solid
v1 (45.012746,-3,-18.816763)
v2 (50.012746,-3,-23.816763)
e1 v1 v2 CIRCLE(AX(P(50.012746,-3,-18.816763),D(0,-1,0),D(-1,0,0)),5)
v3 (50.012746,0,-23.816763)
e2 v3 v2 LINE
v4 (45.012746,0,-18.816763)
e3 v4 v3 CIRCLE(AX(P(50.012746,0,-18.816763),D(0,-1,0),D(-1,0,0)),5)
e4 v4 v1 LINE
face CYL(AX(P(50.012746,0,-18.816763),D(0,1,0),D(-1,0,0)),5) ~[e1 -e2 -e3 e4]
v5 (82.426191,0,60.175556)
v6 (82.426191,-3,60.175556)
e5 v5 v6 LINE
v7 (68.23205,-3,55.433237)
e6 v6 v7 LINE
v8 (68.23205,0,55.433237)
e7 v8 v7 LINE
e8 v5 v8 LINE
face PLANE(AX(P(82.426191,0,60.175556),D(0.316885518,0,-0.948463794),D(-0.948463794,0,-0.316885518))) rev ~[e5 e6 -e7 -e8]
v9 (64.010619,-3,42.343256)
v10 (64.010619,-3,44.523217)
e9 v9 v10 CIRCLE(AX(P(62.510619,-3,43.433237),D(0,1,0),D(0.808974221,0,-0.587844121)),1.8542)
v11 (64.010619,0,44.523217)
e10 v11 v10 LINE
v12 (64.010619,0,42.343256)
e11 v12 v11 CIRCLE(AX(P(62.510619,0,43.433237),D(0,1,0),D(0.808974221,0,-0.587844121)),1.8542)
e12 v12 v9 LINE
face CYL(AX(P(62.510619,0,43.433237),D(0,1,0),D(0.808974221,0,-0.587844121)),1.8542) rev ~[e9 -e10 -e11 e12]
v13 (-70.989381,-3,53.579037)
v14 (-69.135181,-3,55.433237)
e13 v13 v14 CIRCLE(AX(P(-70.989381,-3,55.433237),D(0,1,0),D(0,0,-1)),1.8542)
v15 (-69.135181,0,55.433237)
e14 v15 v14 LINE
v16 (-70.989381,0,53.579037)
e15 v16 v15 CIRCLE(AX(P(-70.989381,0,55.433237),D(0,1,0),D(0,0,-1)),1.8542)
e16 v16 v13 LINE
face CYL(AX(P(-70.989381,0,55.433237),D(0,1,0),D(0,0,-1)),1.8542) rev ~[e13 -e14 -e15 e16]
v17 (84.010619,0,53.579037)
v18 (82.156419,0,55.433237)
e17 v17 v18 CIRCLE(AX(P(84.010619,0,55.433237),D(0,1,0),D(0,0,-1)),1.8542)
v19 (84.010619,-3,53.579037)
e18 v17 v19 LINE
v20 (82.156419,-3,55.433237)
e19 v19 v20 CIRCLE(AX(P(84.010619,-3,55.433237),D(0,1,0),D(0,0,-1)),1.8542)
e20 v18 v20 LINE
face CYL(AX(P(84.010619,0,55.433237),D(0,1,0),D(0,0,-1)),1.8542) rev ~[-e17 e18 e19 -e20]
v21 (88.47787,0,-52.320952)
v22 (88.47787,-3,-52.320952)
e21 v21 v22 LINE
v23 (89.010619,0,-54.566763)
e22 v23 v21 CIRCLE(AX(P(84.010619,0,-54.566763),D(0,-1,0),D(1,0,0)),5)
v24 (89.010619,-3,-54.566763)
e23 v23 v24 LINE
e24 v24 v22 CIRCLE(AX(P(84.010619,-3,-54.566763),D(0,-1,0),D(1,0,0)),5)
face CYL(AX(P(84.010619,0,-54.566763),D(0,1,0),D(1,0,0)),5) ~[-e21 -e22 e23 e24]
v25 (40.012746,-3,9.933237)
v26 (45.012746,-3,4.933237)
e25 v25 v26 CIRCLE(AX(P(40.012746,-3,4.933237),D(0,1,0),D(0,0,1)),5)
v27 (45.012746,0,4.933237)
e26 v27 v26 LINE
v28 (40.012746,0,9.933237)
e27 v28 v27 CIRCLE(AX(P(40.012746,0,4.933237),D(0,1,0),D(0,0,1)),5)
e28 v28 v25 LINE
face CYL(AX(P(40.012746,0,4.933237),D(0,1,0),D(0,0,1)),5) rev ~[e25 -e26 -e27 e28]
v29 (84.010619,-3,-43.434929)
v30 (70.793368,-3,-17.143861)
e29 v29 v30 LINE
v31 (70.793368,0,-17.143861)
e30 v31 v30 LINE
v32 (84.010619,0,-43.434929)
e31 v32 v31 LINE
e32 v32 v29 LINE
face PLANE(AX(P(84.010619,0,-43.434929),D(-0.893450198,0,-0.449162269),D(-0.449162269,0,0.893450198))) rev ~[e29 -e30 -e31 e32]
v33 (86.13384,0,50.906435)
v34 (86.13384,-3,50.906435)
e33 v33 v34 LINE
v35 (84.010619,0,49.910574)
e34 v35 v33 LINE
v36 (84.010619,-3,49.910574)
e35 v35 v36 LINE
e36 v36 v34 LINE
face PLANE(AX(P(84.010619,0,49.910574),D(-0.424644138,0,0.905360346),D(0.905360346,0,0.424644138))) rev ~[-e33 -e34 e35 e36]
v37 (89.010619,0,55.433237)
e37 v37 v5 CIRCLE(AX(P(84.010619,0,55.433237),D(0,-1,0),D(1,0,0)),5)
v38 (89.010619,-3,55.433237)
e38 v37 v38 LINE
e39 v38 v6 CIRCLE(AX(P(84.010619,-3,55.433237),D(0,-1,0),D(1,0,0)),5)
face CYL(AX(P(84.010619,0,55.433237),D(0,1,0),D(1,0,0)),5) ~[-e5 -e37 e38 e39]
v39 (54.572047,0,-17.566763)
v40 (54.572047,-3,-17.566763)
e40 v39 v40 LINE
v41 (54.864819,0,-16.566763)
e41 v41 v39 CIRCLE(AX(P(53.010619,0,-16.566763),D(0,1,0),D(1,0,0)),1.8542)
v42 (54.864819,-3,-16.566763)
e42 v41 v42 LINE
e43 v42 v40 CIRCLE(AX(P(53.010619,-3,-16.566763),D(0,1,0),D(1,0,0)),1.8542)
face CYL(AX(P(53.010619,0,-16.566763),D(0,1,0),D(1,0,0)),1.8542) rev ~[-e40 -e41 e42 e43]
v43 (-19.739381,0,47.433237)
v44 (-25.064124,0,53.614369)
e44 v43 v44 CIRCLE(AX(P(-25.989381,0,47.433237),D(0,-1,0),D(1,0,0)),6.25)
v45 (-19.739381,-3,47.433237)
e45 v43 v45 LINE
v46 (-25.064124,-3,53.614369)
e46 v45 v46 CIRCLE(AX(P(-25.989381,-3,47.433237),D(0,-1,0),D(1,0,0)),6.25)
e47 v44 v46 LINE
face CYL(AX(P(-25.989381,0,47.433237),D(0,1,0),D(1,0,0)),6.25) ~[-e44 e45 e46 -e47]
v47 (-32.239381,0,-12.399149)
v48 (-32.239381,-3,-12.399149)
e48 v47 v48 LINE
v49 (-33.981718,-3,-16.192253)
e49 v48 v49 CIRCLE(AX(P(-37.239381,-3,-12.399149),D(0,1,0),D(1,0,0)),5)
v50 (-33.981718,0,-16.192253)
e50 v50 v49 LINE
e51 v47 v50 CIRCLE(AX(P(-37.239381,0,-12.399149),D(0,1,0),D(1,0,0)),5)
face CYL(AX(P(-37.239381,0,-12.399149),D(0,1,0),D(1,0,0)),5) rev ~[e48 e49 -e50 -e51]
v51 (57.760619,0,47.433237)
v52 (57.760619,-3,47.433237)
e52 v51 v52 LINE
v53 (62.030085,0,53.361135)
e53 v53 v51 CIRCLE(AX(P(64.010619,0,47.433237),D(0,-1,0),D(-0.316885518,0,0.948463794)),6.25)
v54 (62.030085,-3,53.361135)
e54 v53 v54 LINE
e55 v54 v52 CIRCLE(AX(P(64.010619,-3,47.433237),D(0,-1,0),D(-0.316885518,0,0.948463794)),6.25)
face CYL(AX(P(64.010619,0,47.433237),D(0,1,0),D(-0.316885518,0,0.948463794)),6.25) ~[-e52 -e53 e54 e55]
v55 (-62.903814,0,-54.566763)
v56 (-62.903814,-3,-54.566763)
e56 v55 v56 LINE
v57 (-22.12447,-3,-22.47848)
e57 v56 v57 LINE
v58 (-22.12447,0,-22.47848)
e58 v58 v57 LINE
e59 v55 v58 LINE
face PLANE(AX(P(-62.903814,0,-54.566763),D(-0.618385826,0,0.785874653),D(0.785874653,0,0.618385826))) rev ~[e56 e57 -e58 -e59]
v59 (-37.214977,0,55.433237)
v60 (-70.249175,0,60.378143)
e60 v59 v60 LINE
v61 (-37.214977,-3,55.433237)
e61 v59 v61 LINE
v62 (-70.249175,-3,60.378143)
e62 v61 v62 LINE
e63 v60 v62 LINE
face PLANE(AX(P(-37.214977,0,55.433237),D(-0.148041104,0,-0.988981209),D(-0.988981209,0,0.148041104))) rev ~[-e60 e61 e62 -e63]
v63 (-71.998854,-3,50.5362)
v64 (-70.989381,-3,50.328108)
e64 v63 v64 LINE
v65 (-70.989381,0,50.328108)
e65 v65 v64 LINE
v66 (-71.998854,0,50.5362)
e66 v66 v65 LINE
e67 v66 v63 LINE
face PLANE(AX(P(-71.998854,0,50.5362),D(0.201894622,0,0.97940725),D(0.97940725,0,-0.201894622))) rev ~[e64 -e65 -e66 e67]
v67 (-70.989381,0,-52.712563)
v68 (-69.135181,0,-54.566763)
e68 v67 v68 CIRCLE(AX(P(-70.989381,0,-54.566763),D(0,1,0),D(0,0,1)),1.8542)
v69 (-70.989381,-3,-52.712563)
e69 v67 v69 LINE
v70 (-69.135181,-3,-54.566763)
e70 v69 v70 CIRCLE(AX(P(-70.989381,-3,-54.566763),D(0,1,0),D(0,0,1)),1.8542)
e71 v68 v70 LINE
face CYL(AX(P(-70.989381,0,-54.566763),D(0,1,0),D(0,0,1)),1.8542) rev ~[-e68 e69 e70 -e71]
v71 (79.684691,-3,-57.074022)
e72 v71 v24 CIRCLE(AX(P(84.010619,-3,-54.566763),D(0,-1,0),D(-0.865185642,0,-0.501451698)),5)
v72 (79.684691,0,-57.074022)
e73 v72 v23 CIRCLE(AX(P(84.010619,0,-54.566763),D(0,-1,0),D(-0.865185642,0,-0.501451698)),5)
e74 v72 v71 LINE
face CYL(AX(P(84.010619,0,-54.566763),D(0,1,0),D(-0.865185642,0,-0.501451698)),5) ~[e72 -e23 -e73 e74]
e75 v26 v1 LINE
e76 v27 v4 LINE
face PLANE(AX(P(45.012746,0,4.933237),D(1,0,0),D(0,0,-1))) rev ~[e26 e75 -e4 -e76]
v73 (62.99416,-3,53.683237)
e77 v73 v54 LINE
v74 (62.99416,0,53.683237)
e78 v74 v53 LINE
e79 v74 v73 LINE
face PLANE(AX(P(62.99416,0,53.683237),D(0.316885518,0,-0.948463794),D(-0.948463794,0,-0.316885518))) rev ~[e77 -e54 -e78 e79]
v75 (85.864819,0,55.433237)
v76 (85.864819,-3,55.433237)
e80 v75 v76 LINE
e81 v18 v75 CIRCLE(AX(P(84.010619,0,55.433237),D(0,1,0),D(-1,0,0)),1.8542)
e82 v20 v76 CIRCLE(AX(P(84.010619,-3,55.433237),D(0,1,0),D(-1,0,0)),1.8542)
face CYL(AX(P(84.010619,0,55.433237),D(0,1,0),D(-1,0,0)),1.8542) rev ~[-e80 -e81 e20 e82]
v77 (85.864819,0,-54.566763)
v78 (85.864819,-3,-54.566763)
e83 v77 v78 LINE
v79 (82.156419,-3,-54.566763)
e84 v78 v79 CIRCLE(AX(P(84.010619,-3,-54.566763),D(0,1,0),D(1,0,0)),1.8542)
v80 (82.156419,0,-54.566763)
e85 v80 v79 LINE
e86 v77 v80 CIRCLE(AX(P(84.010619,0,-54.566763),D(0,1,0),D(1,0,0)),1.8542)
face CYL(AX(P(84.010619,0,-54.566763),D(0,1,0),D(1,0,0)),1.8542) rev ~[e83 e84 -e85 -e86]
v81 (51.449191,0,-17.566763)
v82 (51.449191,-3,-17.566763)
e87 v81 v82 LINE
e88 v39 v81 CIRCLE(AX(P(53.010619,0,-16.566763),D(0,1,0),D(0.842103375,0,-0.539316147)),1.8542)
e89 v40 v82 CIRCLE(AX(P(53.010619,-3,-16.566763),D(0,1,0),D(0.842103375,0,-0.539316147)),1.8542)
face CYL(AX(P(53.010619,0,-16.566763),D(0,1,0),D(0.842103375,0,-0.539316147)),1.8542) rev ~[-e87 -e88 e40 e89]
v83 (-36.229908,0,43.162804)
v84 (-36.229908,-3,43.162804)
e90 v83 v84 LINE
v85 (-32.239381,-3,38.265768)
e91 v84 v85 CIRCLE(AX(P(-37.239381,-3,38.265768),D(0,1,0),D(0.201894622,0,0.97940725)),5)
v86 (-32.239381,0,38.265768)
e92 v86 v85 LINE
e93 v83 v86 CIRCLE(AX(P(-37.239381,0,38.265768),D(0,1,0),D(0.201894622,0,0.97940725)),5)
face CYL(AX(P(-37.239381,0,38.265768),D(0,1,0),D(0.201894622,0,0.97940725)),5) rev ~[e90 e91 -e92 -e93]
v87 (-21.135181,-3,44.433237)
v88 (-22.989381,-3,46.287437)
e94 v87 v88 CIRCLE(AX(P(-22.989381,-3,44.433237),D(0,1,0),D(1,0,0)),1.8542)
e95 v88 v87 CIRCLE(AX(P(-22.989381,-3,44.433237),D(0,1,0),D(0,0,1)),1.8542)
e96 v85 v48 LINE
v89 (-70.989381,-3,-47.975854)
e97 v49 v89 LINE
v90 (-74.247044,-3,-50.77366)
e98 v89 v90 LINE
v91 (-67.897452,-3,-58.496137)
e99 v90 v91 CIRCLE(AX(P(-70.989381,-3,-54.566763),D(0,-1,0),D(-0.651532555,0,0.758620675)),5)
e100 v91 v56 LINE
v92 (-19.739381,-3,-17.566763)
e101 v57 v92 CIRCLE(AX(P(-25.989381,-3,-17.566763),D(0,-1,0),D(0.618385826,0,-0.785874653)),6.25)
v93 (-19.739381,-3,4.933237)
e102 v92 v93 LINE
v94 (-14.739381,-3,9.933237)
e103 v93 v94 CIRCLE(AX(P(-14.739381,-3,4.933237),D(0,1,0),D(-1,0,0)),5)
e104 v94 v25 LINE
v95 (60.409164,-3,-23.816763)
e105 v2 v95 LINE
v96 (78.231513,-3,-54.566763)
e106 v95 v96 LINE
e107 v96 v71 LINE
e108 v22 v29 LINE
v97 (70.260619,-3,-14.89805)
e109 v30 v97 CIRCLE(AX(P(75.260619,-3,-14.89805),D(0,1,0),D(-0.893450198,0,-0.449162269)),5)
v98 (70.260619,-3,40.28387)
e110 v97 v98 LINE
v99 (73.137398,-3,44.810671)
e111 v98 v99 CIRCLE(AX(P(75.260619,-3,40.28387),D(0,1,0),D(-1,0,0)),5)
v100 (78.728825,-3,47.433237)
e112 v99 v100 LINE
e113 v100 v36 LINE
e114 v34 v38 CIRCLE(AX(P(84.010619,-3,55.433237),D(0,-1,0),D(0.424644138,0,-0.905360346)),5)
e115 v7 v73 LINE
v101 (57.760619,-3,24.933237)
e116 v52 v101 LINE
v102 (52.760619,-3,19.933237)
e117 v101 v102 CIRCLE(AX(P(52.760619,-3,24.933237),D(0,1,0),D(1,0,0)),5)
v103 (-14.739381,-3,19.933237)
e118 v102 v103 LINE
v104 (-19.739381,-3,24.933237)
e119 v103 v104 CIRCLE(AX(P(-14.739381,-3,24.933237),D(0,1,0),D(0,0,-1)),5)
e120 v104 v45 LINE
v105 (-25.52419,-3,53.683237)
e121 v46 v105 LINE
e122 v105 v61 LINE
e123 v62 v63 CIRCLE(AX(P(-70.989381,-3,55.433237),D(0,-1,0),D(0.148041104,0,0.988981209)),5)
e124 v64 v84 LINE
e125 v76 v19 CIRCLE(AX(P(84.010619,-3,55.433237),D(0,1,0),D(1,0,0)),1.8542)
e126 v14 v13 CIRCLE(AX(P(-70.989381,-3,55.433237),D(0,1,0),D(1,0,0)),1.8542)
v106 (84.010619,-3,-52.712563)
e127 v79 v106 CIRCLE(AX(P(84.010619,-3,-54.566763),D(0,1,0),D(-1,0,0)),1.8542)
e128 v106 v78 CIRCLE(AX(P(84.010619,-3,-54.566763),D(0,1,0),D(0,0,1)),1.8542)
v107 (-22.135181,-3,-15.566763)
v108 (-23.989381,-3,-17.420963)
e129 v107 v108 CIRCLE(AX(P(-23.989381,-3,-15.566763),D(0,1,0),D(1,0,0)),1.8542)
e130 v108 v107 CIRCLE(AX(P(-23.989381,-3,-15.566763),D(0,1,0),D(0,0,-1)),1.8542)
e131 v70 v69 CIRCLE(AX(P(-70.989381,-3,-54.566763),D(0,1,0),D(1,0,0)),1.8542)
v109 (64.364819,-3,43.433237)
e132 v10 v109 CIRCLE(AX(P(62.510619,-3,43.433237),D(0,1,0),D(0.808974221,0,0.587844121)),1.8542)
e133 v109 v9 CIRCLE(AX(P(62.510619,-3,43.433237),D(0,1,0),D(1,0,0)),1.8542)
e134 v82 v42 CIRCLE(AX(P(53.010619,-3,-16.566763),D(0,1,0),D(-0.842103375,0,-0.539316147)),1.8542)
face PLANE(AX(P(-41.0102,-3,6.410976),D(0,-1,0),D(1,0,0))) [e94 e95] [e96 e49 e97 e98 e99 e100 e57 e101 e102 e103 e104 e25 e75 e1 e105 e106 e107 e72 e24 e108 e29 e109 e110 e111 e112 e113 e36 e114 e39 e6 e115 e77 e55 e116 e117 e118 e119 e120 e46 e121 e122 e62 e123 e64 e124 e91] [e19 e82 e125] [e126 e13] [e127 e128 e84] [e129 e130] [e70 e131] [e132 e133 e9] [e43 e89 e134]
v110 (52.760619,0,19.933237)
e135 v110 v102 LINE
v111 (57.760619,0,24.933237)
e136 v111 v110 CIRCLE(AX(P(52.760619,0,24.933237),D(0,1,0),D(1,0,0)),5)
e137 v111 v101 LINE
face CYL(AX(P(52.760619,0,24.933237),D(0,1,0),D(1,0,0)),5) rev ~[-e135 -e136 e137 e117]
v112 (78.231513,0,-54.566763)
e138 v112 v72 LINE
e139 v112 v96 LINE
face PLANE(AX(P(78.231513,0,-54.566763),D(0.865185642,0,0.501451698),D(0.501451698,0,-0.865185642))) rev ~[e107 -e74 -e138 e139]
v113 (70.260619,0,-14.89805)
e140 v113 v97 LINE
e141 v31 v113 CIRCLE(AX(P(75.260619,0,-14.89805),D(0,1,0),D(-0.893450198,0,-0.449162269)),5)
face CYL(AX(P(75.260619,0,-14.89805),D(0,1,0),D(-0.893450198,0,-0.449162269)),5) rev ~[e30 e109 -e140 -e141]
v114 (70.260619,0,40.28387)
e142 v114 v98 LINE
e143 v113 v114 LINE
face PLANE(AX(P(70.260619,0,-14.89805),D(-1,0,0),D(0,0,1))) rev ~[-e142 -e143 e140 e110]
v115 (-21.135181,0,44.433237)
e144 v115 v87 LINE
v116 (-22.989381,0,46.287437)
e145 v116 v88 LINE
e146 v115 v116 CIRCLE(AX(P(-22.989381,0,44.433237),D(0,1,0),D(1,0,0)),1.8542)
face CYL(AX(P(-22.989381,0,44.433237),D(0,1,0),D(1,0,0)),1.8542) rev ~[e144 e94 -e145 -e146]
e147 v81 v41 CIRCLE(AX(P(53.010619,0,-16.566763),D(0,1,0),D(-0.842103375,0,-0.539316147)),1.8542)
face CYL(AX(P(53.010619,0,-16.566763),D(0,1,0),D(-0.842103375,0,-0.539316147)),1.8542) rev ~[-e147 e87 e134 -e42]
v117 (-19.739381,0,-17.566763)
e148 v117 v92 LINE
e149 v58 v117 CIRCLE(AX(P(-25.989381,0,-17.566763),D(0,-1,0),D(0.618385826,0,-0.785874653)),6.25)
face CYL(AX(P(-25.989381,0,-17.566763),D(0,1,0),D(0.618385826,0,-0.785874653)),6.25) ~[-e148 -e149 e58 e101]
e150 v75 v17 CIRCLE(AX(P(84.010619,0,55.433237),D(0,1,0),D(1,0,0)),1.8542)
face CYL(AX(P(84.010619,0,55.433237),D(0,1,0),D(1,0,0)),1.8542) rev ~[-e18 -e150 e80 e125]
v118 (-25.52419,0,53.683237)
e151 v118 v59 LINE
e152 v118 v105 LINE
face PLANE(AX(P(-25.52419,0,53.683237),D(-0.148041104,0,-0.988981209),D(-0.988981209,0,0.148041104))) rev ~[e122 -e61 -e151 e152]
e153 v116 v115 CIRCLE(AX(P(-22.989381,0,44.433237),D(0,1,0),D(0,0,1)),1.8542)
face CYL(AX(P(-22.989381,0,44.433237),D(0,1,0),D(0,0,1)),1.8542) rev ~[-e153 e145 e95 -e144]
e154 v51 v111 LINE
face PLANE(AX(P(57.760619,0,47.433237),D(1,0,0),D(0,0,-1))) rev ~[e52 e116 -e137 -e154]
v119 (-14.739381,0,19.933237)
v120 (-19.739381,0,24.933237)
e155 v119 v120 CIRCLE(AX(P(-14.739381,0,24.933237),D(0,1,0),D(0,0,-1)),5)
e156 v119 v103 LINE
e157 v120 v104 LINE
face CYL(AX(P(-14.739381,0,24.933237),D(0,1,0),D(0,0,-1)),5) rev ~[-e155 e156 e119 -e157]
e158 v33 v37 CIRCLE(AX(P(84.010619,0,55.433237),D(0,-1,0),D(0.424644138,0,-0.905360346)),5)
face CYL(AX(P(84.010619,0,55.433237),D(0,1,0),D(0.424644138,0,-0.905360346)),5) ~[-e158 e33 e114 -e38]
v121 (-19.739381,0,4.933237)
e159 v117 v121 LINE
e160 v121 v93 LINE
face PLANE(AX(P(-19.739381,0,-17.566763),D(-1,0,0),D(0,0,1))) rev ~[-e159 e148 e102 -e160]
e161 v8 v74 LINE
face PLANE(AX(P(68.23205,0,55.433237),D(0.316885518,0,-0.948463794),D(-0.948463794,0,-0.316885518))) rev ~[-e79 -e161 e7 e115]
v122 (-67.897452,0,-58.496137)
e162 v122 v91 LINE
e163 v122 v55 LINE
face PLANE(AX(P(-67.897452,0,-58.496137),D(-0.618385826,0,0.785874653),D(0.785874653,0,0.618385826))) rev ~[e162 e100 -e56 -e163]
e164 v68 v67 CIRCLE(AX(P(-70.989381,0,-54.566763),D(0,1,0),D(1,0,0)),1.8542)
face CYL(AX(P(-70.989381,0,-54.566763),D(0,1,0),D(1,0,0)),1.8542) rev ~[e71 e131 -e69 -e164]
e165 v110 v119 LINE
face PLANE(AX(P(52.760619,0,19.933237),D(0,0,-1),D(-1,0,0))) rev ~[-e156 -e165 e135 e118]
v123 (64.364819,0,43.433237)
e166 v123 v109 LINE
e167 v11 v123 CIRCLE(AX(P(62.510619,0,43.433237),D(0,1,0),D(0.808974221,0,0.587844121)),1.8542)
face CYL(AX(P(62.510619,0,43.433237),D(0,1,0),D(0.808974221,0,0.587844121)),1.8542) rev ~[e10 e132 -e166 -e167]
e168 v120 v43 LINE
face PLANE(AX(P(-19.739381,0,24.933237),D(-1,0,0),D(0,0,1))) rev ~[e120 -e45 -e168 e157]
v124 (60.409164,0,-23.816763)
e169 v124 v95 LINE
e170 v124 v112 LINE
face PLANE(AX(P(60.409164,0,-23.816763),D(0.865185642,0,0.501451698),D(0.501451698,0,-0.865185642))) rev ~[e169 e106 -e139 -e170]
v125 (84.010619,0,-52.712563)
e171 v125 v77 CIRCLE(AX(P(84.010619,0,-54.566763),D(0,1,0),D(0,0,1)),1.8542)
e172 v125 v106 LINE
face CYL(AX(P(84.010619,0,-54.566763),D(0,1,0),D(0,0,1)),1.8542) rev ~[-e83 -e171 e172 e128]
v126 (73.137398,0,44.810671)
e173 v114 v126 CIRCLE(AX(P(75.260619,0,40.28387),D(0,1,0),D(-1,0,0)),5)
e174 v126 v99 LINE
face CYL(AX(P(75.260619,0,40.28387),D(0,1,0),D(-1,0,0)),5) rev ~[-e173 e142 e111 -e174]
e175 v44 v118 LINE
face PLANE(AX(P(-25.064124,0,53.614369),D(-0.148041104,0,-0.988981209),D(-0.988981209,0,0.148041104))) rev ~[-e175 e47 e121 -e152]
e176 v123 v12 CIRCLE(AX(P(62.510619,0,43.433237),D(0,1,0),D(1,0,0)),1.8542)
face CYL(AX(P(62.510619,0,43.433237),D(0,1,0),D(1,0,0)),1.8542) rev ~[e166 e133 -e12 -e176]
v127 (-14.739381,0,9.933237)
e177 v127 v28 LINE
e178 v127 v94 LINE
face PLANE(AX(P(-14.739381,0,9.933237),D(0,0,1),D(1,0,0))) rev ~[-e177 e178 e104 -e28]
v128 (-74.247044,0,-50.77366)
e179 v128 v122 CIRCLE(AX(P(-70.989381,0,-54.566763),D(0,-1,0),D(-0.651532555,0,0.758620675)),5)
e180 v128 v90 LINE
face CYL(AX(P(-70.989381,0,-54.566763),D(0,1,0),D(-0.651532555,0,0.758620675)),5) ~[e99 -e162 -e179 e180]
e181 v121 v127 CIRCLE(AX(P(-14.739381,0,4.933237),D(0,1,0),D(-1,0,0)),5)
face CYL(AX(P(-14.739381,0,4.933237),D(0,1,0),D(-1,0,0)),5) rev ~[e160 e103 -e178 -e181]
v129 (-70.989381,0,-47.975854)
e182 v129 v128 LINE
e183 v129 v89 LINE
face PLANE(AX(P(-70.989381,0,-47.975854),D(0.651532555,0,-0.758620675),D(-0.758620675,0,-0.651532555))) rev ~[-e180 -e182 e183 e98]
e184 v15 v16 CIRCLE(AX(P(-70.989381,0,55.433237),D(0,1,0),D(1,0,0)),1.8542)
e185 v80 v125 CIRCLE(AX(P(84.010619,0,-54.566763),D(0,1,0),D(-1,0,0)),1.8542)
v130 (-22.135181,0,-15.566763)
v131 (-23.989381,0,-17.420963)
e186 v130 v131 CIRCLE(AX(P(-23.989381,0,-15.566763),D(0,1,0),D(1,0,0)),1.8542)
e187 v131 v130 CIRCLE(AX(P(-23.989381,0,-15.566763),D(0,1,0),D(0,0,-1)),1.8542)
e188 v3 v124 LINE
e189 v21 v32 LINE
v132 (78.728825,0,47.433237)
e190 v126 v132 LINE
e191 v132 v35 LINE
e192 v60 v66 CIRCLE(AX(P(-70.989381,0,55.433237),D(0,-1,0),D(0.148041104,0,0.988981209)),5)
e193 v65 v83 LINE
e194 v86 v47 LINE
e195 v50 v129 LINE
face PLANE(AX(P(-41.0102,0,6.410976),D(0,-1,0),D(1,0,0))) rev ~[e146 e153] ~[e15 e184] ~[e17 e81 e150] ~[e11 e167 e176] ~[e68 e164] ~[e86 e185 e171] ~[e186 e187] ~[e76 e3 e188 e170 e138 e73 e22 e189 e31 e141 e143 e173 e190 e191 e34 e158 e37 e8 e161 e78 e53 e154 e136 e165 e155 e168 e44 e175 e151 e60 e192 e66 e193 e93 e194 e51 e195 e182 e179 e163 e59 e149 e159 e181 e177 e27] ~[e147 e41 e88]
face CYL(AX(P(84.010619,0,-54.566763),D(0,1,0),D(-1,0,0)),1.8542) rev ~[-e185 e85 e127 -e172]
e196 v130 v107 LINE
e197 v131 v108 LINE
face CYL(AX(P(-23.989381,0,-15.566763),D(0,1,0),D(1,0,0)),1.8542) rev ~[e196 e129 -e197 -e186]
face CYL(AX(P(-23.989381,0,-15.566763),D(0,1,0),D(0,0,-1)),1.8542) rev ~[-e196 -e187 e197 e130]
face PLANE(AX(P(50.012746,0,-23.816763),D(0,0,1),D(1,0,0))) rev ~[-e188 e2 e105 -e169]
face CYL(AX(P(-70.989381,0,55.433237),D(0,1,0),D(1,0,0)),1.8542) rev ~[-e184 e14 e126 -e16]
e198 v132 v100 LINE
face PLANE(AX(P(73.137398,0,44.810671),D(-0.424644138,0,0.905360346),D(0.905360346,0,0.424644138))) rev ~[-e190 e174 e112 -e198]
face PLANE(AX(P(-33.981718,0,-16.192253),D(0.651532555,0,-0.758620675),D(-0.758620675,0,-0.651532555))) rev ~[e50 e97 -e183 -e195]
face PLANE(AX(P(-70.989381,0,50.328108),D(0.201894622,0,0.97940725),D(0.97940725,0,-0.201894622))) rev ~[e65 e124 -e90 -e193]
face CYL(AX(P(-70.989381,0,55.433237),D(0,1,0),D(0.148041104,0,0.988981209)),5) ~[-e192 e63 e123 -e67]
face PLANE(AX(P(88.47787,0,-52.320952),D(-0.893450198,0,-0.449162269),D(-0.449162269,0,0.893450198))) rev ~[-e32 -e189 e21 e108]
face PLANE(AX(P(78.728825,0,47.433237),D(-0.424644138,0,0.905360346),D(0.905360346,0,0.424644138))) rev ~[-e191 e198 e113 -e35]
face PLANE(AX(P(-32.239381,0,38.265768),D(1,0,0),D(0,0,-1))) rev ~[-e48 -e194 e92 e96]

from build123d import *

# Parameters (mm, degrees)
F1_DEPTH = 3


# Not quite as in the source:
# - a feature names something its author has since deleted; it is built from what else it names


with BuildPart() as f1:
    # F0 (on Front) → F1 (new body)
    with BuildSketch(Plane.XZ):
        with BuildLine():
            Line((-37.214977254, 55.4332367199), (-65.9893809259, 55.4332367199))
            ThreePointArc((-65.9893809259, 55.4332367199), (-67.45384702, 51.8977028139), (-70.9893809259, 50.4332367199))
            Line((-70.9893809259, 50.4332367199), (-70.9893809259, 50.3281080825))
            Line((-70.9893809259, 50.3281080825), (-36.2299078147, 43.1628040761))
            ThreePointArc((-36.2299078147, 43.1628040761), (-33.3633413521, 41.4242986902), (-32.2393809259, 38.2657678257))
            Line((-32.2393809259, 38.2657678257), (-32.2393809259, -12.3991493743))
            ThreePointArc((-32.2393809259, -12.3991493743), (-32.6957967743, -14.4862150316), (-33.9817181489, -16.1922527517))
            Line((-33.9817181489, -16.1922527517), (-70.9893809259, -47.9758540661))
            Line((-70.9893809259, -47.9758540661), (-70.9893809259, -49.5667632801))
            ThreePointArc((-70.9893809259, -49.5667632801), (-67.45384702, -51.0312293742), (-65.9893809259, -54.5667632801))
            Line((-65.9893809259, -54.5667632801), (-62.9038139694, -54.5667632801))
            Line((-62.9038139694, -54.5667632801), (-22.1244695142, -22.4784798619))
            ThreePointArc((-22.1244695142, -22.4784798619), (-31.8953409933, -19.6117903415), (-25.9893809259, -11.3167632801))
            Line((-25.9893809259, -11.3167632801), (-25.9893809259, 41.1832367199))
            ThreePointArc((-25.9893809259, 41.1832367199), (-32.2393809259, 47.4332367199), (-25.9893809259, 53.6832367199))
            Line((-25.9893809259, 53.6832367199), (-25.5241895532, 53.6832367199))
            Line((-25.5241895532, 53.6832367199), (-37.214977254, 55.4332367199))
        make_face()
        with BuildLine():
            ThreePointArc((-70.2491754069, 60.3781427644), (-67.2011737249, 58.6965917729), (-65.9893809259, 55.4332367199))
            Line((-65.9893809259, 55.4332367199), (-37.214977254, 55.4332367199))
            Line((-37.214977254, 55.4332367199), (-70.2491754069, 60.3781427644))
        make_face()
        with BuildLine():
            ThreePointArc((-19.7393809259, 47.4332367199), (-21.2541219247, 51.5124305362), (-25.0641240271, 53.6143692756))
            ThreePointArc((-25.0641240271, 53.6143692756), (-25.5254727848, 53.6659960796), (-25.9893809259, 53.6832367199))
            ThreePointArc((-25.9893809259, 53.6832367199), (-32.2393809259, 47.4332367199), (-25.9893809259, 41.1832367199))
            ThreePointArc((-25.9893809259, 41.1832367199), (-21.5699635435, 43.0138193375), (-19.7393809259, 47.4332367199))
        make_face()
        with BuildLine():
            ThreePointArc((-21.1351809259, 44.4332367199), (-24.3004983196, 43.1221193262), (-22.9893809259, 46.2874367199))
            ThreePointArc((-22.9893809259, 46.2874367199), (-21.6782635322, 45.7443541135), (-21.1351809259, 44.4332367199))
        make_face(mode=Mode.SUBTRACT)
        with BuildLine():
            Line((-19.7393809259, 24.9332367629), (-19.7393809259, 47.4332367199))
            ThreePointArc((-19.7393809259, 47.4332367199), (-21.5699635435, 43.0138193375), (-25.9893809259, 41.1832367199))
            Line((-25.9893809259, 41.1832367199), (-25.9893809259, -11.3167632801))
            ThreePointArc((-25.9893809259, -11.3167632801), (-21.5699635435, -13.1473458977), (-19.7393809259, -17.5667632801))
            Line((-19.7393809259, -17.5667632801), (-19.7393809259, 4.9332367199))
            ThreePointArc((-19.7393809259, 4.9332367199), (-18.2749148318, 8.4687706258), (-14.7393809259, 9.9332367199))
            Line((-14.7393809259, 9.9332367199), (40.0127460063, 9.9332367199))
            ThreePointArc((40.0127460063, 9.9332367199), (43.5482799122, 8.4687706258), (45.0127460063, 4.9332367199))
            Line((45.0127460063, 4.9332367199), (45.0127460063, -17.5667632801))
            Line((45.0127460063, -17.5667632801), (51.449190997, -17.5667632801))
            ThreePointArc((51.449190997, -17.5667632801), (52.4896307348, -14.7872608805), (54.8648190741, -16.5667632801))
            ThreePointArc((54.8648190741, -16.5667632801), (54.7901214737, -17.0877516195), (54.5720471512, -17.5667632801))
            Line((54.5720471512, -17.5667632801), (57.7606190741, -17.5667632801))
            ThreePointArc((57.7606190741, -17.5667632801), (59.5912016917, -13.1473458977), (64.0106190741, -11.3167632801))
            Line((64.0106190741, -11.3167632801), (64.0106190741, 41.1832367199))
            ThreePointArc((64.0106190741, 41.1832367199), (59.5912016917, 43.0138193375), (57.7606190741, 47.4332367199))
            Line((57.7606190741, 47.4332367199), (57.7606190741, 24.9332367629))
            ThreePointArc((57.7606190741, 24.9332367629), (56.29615298, 21.3977028569), (52.7606190741, 19.9332367629))
            Line((52.7606190741, 19.9332367629), (-14.7393809259, 19.9332367629))
            ThreePointArc((-14.7393809259, 19.9332367629), (-18.2749148318, 21.3977028569), (-19.7393809259, 24.9332367629))
        make_face()
        with BuildLine():
            Line((-25.9893809259, -17.5667632801), (-25.9893809259, -11.3167632801))
            ThreePointArc((-25.9893809259, -11.3167632801), (-31.8953409933, -19.6117903415), (-22.1244695142, -22.4784798619))
            ThreePointArc((-22.1244695142, -22.4784798619), (-20.36718401, -20.2968551904), (-19.7393809259, -17.5667632801))
            Line((-19.7393809259, -17.5667632801), (-23.9893809259, -17.5667632801))
            Line((-23.9893809259, -17.5667632801), (-25.9893809259, -17.5667632801))
        make_face()
        with BuildLine():
            ThreePointArc((-19.7393809259, -17.5667632801), (-21.5699635435, -13.1473458977), (-25.9893809259, -11.3167632801))
            Line((-25.9893809259, -11.3167632801), (-25.9893809259, -17.5667632801))
            Line((-25.9893809259, -17.5667632801), (-23.9893809259, -17.5667632801))
            Line((-23.9893809259, -17.5667632801), (-19.7393809259, -17.5667632801))
        make_face()
        with BuildLine():
            ThreePointArc((-22.1351809259, -15.5667632801), (-22.6782635322, -16.8778806738), (-23.9893809259, -17.4209632801))
            ThreePointArc((-23.9893809259, -17.4209632801), (-25.3004983196, -14.2556458865), (-22.1351809259, -15.5667632801))
        make_face(mode=Mode.SUBTRACT)
        with BuildLine():
            Line((-62.9038139694, -54.5667632801), (-65.9893809259, -54.5667632801))
            ThreePointArc((-65.9893809259, -54.5667632801), (-66.4916233931, -56.7508368083), (-67.8974517965, -58.4961365456))
            Line((-67.8974517965, -58.4961365456), (-62.9038139694, -54.5667632801))
        make_face()
        with BuildLine():
            Line((-70.9893809259, -49.5667632801), (-70.9893809259, -47.9758540661))
            Line((-70.9893809259, -47.9758540661), (-74.2470437029, -50.7736599027))
            ThreePointArc((-74.2470437029, -50.7736599027), (-72.7264018114, -49.8781858367), (-70.9893809259, -49.5667632801))
        make_face()
        with BuildLine():
            Line((51.449190997, -17.5667632801), (45.0127460063, -17.5667632801))
            Line((45.0127460063, -17.5667632801), (45.0127460063, -18.8167632801))
            ThreePointArc((45.0127460063, -18.8167632801), (46.4772121003, -22.3522971861), (50.0127460063, -23.8167632801))
            Line((50.0127460063, -23.8167632801), (60.4091643842, -23.8167632801))
            Line((60.4091643842, -23.8167632801), (58.6032088142, -20.7008363936))
            ThreePointArc((58.6032088142, -20.7008363936), (57.974941228, -19.1894440675), (57.7606190741, -17.5667632801))
            Line((57.7606190741, -17.5667632801), (54.5720471512, -17.5667632801))
            ThreePointArc((54.5720471512, -17.5667632801), (53.0106190741, -18.4209632801), (51.449190997, -17.5667632801))
        make_face()
        with BuildLine():
            ThreePointArc((64.0106190741, 53.6832367199), (63.0073411856, 53.6021858588), (62.0300845889, 53.361135433))
            ThreePointArc((62.0300845889, 53.361135433), (58.9390887068, 51.0859178904), (57.7606190741, 47.4332367199))
            Line((57.7606190741, 47.4332367199), (64.0106190741, 47.4332367199))
            Line((64.0106190741, 47.4332367199), (70.2606190741, 47.4332367199))
            ThreePointArc((70.2606190741, 47.4332367199), (68.4300364565, 51.8526541023), (64.0106190741, 53.6832367199))
        make_face()
        with BuildLine():
            Line((82.4261914859, 60.1755556903), (68.2320500904, 55.4332367199))
            Line((68.2320500904, 55.4332367199), (79.0106190741, 55.4332367199))
            ThreePointArc((79.0106190741, 55.4332367199), (79.9533947803, 58.3553816563), (82.4261914859, 60.1755556903))
        make_face()
        with BuildLine():
            Line((79.0106190741, 55.4332367199), (68.2320500904, 55.4332367199))
            Line((68.2320500904, 55.4332367199), (62.9941595991, 53.6832367199))
            Line((62.9941595991, 53.6832367199), (64.0106190741, 53.6832367199))
            ThreePointArc((64.0106190741, 53.6832367199), (68.4300364565, 51.8526541023), (70.2606190741, 47.4332367199))
            Line((70.2606190741, 47.4332367199), (78.7288252988, 47.4332367199))
            Line((78.7288252988, 47.4332367199), (84.0106190741, 49.9105738121))
            Line((84.0106190741, 49.9105738121), (84.0106190741, 50.4332367199))
            ThreePointArc((84.0106190741, 50.4332367199), (80.4750851682, 51.8977028139), (79.0106190741, 55.4332367199))
        make_face()
        with BuildLine():
            Line((78.7288252988, 47.4332367199), (70.2606190741, 47.4332367199))
            ThreePointArc((70.2606190741, 47.4332367199), (68.4300364565, 43.0138193375), (64.0106190741, 41.1832367199))
            Line((64.0106190741, 41.1832367199), (64.0106190741, -11.3167632801))
            ThreePointArc((64.0106190741, -11.3167632801), (68.4300364565, -13.1473458977), (70.2606190741, -17.5667632801))
            ThreePointArc((70.2606190741, -17.5667632801), (68.4300364565, -21.9861806625), (64.0106190741, -23.8167632801))
            Line((64.0106190741, -23.8167632801), (60.4091643842, -23.8167632801))
            Line((60.4091643842, -23.8167632801), (78.2315125337, -54.5667632801))
            Line((78.2315125337, -54.5667632801), (79.0106190741, -54.5667632801))
            ThreePointArc((79.0106190741, -54.5667632801), (80.4750851682, -51.0312293742), (84.0106190741, -49.5667632801))
            Line((84.0106190741, -49.5667632801), (84.0106190741, -43.4349288765))
            Line((84.0106190741, -43.4349288765), (70.7933680849, -17.1438614305))
            ThreePointArc((70.7933680849, -17.1438614305), (70.3956290974, -16.0521179023), (70.2606190741, -14.898050085))
            Line((70.2606190741, -14.898050085), (70.2606190741, 40.2838696489))
            ThreePointArc((70.2606190741, 40.2838696489), (71.0406603386, 42.965650451), (73.1373983825, 44.810671378))
            Line((73.1373983825, 44.810671378), (78.7288252988, 47.4332367199))
        make_face()
        with BuildLine():
            Line((64.0106190741, 47.4332367199), (57.7606190741, 47.4332367199))
            ThreePointArc((57.7606190741, 47.4332367199), (59.5912016917, 43.0138193375), (64.0106190741, 41.1832367199))
            Line((64.0106190741, 41.1832367199), (64.0106190741, 42.3432561512))
            ThreePointArc((64.0106190741, 42.3432561512), (60.6564190741, 43.4332367199), (64.0106190741, 44.5232172885))
            Line((64.0106190741, 44.5232172885), (64.0106190741, 47.4332367199))
        make_face()
        with BuildLine():
            Line((64.0106190741, -17.5667632801), (64.0106190741, -11.3167632801))
            ThreePointArc((64.0106190741, -11.3167632801), (59.5912016917, -13.1473458977), (57.7606190741, -17.5667632801))
            Line((57.7606190741, -17.5667632801), (64.0106190741, -17.5667632801))
        make_face()
        with BuildLine():
            ThreePointArc((70.2606190741, -17.5667632801), (68.4300364565, -13.1473458977), (64.0106190741, -11.3167632801))
            Line((64.0106190741, -11.3167632801), (64.0106190741, -17.5667632801))
            Line((64.0106190741, -17.5667632801), (57.7606190741, -17.5667632801))
            ThreePointArc((57.7606190741, -17.5667632801), (57.974941228, -19.1894440675), (58.6032088142, -20.7008363936))
            ThreePointArc((58.6032088142, -20.7008363936), (60.8901589285, -22.9820406026), (64.0106190741, -23.8167632801))
            ThreePointArc((64.0106190741, -23.8167632801), (68.4300364565, -21.9861806625), (70.2606190741, -17.5667632801))
        make_face()
        with BuildLine():
            Line((58.6032088142, -20.7008363936), (60.4091643842, -23.8167632801))
            Line((60.4091643842, -23.8167632801), (64.0106190741, -23.8167632801))
            ThreePointArc((64.0106190741, -23.8167632801), (60.8901589285, -22.9820406026), (58.6032088142, -20.7008363936))
        make_face()
        with BuildLine():
            Line((88.4778700633, -52.3209519346), (84.0106190741, -43.4349288765))
            Line((84.0106190741, -43.4349288765), (84.0106190741, -49.5667632801))
            ThreePointArc((84.0106190741, -49.5667632801), (86.6346372974, -50.3106466976), (88.4778700633, -52.3209519346))
        make_face()
        with BuildLine():
            ThreePointArc((-70.9893809259, 53.5790367199), (-72.3004983196, 56.7443541135), (-69.1351809259, 55.4332367199))
            Line((-69.1351809259, 55.4332367199), (-65.9893809259, 55.4332367199))
            ThreePointArc((-65.9893809259, 55.4332367199), (-67.2011737249, 58.6965917729), (-70.2491754069, 60.3781427644))
            ThreePointArc((-70.2491754069, 60.3781427644), (-75.9121934648, 56.3084033935), (-71.9988540371, 50.5362004695))
            ThreePointArc((-71.9988540371, 50.5362004695), (-71.4967361998, 50.4590442602), (-70.9893809259, 50.4332367199))
            Line((-70.9893809259, 50.4332367199), (-70.9893809259, 53.5790367199))
        make_face()
        with BuildLine():
            Line((-65.9893809259, 55.4332367199), (-69.1351809259, 55.4332367199))
            ThreePointArc((-69.1351809259, 55.4332367199), (-69.6782635322, 54.1221193262), (-70.9893809259, 53.5790367199))
            Line((-70.9893809259, 53.5790367199), (-70.9893809259, 50.4332367199))
            ThreePointArc((-70.9893809259, 50.4332367199), (-67.45384702, 51.8977028139), (-65.9893809259, 55.4332367199))
        make_face()
        with BuildLine():
            ThreePointArc((82.4261914859, 60.1755556903), (79.9533947803, 58.3553816563), (79.0106190741, 55.4332367199))
            Line((79.0106190741, 55.4332367199), (82.1564190741, 55.4332367199))
            ThreePointArc((82.1564190741, 55.4332367199), (84.0106190741, 57.2874367199), (85.8648190741, 55.4332367199))
            ThreePointArc((85.8648190741, 55.4332367199), (85.3217364678, 54.1221193262), (84.0106190741, 53.5790367199))
            Line((84.0106190741, 53.5790367199), (84.0106190741, 50.4332367199))
            ThreePointArc((84.0106190741, 50.4332367199), (85.0982751214, 50.5529698908), (86.1338397657, 50.9064349908))
            ThreePointArc((86.1338397657, 50.9064349908), (88.2305778096, 52.7514559177), (89.0106190741, 55.4332367199))
            ThreePointArc((89.0106190741, 55.4332367199), (86.9327640105, 59.4904610137), (82.4261914859, 60.1755556903))
        make_face()
        with BuildLine():
            Line((82.1564190741, 55.4332367199), (79.0106190741, 55.4332367199))
            ThreePointArc((79.0106190741, 55.4332367199), (80.4750851682, 51.8977028139), (84.0106190741, 50.4332367199))
            Line((84.0106190741, 50.4332367199), (84.0106190741, 53.5790367199))
            ThreePointArc((84.0106190741, 53.5790367199), (82.6995016804, 54.1221193262), (82.1564190741, 55.4332367199))
        make_face()
        with BuildLine():
            ThreePointArc((-65.9893809259, -54.5667632801), (-67.45384702, -51.0312293742), (-70.9893809259, -49.5667632801))
            Line((-70.9893809259, -49.5667632801), (-70.9893809259, -52.7125632801))
            ThreePointArc((-70.9893809259, -52.7125632801), (-69.6782635322, -53.2556458865), (-69.1351809259, -54.5667632801))
            Line((-69.1351809259, -54.5667632801), (-65.9893809259, -54.5667632801))
        make_face()
        with BuildLine():
            Line((-70.9893809259, -52.7125632801), (-70.9893809259, -49.5667632801))
            ThreePointArc((-70.9893809259, -49.5667632801), (-72.7264018114, -49.8781858367), (-74.2470437029, -50.7736599027))
            ThreePointArc((-74.2470437029, -50.7736599027), (-74.8515083558, -57.7422902781), (-67.8974517965, -58.4961365456))
            ThreePointArc((-67.8974517965, -58.4961365456), (-66.4916233931, -56.7508368083), (-65.9893809259, -54.5667632801))
            Line((-65.9893809259, -54.5667632801), (-69.1351809259, -54.5667632801))
            ThreePointArc((-69.1351809259, -54.5667632801), (-72.3004983196, -55.8778806738), (-70.9893809259, -52.7125632801))
        make_face()
        with BuildLine():
            ThreePointArc((84.0106190741, -49.5667632801), (80.4750851682, -51.0312293742), (79.0106190741, -54.5667632801))
            Line((79.0106190741, -54.5667632801), (82.1564190741, -54.5667632801))
            ThreePointArc((82.1564190741, -54.5667632801), (82.6995016804, -53.2556458865), (84.0106190741, -52.7125632801))
            Line((84.0106190741, -52.7125632801), (84.0106190741, -49.5667632801))
        make_face()
        with BuildLine():
            Line((82.1564190741, -54.5667632801), (79.0106190741, -54.5667632801))
            ThreePointArc((79.0106190741, -54.5667632801), (79.1820767972, -55.86490791), (79.6846908662, -57.0740217709))
            ThreePointArc((79.6846908662, -57.0740217709), (85.308763704, -59.395305557), (89.0106190741, -54.5667632801))
            ThreePointArc((89.0106190741, -54.5667632801), (88.8756090508, -53.4126954628), (88.4778700633, -52.3209519346))
            ThreePointArc((88.4778700633, -52.3209519346), (86.6346372974, -50.3106466976), (84.0106190741, -49.5667632801))
            Line((84.0106190741, -49.5667632801), (84.0106190741, -52.7125632801))
            ThreePointArc((84.0106190741, -52.7125632801), (85.3217364678, -53.2556458865), (85.8648190741, -54.5667632801))
            ThreePointArc((85.8648190741, -54.5667632801), (84.0106190741, -56.4209632801), (82.1564190741, -54.5667632801))
        make_face()
        with BuildLine():
            Line((79.0106190741, -54.5667632801), (78.2315125337, -54.5667632801))
            Line((78.2315125337, -54.5667632801), (79.6846908662, -57.0740217709))
            ThreePointArc((79.6846908662, -57.0740217709), (79.1820767972, -55.86490791), (79.0106190741, -54.5667632801))
        make_face()
        with BuildLine():
            ThreePointArc((86.1338397657, 50.9064349908), (85.0982751214, 50.5529698908), (84.0106190741, 50.4332367199))
            Line((84.0106190741, 50.4332367199), (84.0106190741, 49.9105738121))
            Line((84.0106190741, 49.9105738121), (86.1338397657, 50.9064349908))
        make_face()
        with BuildLine():
            Line((64.0106190741, 53.6832367199), (62.9941595991, 53.6832367199))
            Line((62.9941595991, 53.6832367199), (62.0300845889, 53.361135433))
            ThreePointArc((62.0300845889, 53.361135433), (63.0073411856, 53.6021858588), (64.0106190741, 53.6832367199))
        make_face()
        with BuildLine():
            Line((-70.9893809259, 50.3281080825), (-70.9893809259, 50.4332367199))
            ThreePointArc((-70.9893809259, 50.4332367199), (-71.4967361998, 50.4590442602), (-71.9988540371, 50.5362004695))
            Line((-71.9988540371, 50.5362004695), (-70.9893809259, 50.3281080825))
        make_face()
        with BuildLine():
            Line((-25.0641240271, 53.6143692756), (-25.5241895532, 53.6832367199))
            Line((-25.5241895532, 53.6832367199), (-25.9893809259, 53.6832367199))
            ThreePointArc((-25.9893809259, 53.6832367199), (-25.5254727848, 53.6659960796), (-25.0641240271, 53.6143692756))
        make_face()
        with BuildLine():
            ThreePointArc((64.0106190741, 41.1832367199), (68.4300364565, 43.0138193375), (70.2606190741, 47.4332367199))
            Line((70.2606190741, 47.4332367199), (64.0106190741, 47.4332367199))
            Line((64.0106190741, 47.4332367199), (64.0106190741, 44.5232172885))
            ThreePointArc((64.0106190741, 44.5232172885), (64.2740472184, 44.0062801912), (64.3648190741, 43.4332367199))
            ThreePointArc((64.3648190741, 43.4332367199), (64.2740472184, 42.8601932486), (64.0106190741, 42.3432561512))
            Line((64.0106190741, 42.3432561512), (64.0106190741, 41.1832367199))
        make_face()
    extrude(amount=F1_DEPTH)


solid = f1.part
